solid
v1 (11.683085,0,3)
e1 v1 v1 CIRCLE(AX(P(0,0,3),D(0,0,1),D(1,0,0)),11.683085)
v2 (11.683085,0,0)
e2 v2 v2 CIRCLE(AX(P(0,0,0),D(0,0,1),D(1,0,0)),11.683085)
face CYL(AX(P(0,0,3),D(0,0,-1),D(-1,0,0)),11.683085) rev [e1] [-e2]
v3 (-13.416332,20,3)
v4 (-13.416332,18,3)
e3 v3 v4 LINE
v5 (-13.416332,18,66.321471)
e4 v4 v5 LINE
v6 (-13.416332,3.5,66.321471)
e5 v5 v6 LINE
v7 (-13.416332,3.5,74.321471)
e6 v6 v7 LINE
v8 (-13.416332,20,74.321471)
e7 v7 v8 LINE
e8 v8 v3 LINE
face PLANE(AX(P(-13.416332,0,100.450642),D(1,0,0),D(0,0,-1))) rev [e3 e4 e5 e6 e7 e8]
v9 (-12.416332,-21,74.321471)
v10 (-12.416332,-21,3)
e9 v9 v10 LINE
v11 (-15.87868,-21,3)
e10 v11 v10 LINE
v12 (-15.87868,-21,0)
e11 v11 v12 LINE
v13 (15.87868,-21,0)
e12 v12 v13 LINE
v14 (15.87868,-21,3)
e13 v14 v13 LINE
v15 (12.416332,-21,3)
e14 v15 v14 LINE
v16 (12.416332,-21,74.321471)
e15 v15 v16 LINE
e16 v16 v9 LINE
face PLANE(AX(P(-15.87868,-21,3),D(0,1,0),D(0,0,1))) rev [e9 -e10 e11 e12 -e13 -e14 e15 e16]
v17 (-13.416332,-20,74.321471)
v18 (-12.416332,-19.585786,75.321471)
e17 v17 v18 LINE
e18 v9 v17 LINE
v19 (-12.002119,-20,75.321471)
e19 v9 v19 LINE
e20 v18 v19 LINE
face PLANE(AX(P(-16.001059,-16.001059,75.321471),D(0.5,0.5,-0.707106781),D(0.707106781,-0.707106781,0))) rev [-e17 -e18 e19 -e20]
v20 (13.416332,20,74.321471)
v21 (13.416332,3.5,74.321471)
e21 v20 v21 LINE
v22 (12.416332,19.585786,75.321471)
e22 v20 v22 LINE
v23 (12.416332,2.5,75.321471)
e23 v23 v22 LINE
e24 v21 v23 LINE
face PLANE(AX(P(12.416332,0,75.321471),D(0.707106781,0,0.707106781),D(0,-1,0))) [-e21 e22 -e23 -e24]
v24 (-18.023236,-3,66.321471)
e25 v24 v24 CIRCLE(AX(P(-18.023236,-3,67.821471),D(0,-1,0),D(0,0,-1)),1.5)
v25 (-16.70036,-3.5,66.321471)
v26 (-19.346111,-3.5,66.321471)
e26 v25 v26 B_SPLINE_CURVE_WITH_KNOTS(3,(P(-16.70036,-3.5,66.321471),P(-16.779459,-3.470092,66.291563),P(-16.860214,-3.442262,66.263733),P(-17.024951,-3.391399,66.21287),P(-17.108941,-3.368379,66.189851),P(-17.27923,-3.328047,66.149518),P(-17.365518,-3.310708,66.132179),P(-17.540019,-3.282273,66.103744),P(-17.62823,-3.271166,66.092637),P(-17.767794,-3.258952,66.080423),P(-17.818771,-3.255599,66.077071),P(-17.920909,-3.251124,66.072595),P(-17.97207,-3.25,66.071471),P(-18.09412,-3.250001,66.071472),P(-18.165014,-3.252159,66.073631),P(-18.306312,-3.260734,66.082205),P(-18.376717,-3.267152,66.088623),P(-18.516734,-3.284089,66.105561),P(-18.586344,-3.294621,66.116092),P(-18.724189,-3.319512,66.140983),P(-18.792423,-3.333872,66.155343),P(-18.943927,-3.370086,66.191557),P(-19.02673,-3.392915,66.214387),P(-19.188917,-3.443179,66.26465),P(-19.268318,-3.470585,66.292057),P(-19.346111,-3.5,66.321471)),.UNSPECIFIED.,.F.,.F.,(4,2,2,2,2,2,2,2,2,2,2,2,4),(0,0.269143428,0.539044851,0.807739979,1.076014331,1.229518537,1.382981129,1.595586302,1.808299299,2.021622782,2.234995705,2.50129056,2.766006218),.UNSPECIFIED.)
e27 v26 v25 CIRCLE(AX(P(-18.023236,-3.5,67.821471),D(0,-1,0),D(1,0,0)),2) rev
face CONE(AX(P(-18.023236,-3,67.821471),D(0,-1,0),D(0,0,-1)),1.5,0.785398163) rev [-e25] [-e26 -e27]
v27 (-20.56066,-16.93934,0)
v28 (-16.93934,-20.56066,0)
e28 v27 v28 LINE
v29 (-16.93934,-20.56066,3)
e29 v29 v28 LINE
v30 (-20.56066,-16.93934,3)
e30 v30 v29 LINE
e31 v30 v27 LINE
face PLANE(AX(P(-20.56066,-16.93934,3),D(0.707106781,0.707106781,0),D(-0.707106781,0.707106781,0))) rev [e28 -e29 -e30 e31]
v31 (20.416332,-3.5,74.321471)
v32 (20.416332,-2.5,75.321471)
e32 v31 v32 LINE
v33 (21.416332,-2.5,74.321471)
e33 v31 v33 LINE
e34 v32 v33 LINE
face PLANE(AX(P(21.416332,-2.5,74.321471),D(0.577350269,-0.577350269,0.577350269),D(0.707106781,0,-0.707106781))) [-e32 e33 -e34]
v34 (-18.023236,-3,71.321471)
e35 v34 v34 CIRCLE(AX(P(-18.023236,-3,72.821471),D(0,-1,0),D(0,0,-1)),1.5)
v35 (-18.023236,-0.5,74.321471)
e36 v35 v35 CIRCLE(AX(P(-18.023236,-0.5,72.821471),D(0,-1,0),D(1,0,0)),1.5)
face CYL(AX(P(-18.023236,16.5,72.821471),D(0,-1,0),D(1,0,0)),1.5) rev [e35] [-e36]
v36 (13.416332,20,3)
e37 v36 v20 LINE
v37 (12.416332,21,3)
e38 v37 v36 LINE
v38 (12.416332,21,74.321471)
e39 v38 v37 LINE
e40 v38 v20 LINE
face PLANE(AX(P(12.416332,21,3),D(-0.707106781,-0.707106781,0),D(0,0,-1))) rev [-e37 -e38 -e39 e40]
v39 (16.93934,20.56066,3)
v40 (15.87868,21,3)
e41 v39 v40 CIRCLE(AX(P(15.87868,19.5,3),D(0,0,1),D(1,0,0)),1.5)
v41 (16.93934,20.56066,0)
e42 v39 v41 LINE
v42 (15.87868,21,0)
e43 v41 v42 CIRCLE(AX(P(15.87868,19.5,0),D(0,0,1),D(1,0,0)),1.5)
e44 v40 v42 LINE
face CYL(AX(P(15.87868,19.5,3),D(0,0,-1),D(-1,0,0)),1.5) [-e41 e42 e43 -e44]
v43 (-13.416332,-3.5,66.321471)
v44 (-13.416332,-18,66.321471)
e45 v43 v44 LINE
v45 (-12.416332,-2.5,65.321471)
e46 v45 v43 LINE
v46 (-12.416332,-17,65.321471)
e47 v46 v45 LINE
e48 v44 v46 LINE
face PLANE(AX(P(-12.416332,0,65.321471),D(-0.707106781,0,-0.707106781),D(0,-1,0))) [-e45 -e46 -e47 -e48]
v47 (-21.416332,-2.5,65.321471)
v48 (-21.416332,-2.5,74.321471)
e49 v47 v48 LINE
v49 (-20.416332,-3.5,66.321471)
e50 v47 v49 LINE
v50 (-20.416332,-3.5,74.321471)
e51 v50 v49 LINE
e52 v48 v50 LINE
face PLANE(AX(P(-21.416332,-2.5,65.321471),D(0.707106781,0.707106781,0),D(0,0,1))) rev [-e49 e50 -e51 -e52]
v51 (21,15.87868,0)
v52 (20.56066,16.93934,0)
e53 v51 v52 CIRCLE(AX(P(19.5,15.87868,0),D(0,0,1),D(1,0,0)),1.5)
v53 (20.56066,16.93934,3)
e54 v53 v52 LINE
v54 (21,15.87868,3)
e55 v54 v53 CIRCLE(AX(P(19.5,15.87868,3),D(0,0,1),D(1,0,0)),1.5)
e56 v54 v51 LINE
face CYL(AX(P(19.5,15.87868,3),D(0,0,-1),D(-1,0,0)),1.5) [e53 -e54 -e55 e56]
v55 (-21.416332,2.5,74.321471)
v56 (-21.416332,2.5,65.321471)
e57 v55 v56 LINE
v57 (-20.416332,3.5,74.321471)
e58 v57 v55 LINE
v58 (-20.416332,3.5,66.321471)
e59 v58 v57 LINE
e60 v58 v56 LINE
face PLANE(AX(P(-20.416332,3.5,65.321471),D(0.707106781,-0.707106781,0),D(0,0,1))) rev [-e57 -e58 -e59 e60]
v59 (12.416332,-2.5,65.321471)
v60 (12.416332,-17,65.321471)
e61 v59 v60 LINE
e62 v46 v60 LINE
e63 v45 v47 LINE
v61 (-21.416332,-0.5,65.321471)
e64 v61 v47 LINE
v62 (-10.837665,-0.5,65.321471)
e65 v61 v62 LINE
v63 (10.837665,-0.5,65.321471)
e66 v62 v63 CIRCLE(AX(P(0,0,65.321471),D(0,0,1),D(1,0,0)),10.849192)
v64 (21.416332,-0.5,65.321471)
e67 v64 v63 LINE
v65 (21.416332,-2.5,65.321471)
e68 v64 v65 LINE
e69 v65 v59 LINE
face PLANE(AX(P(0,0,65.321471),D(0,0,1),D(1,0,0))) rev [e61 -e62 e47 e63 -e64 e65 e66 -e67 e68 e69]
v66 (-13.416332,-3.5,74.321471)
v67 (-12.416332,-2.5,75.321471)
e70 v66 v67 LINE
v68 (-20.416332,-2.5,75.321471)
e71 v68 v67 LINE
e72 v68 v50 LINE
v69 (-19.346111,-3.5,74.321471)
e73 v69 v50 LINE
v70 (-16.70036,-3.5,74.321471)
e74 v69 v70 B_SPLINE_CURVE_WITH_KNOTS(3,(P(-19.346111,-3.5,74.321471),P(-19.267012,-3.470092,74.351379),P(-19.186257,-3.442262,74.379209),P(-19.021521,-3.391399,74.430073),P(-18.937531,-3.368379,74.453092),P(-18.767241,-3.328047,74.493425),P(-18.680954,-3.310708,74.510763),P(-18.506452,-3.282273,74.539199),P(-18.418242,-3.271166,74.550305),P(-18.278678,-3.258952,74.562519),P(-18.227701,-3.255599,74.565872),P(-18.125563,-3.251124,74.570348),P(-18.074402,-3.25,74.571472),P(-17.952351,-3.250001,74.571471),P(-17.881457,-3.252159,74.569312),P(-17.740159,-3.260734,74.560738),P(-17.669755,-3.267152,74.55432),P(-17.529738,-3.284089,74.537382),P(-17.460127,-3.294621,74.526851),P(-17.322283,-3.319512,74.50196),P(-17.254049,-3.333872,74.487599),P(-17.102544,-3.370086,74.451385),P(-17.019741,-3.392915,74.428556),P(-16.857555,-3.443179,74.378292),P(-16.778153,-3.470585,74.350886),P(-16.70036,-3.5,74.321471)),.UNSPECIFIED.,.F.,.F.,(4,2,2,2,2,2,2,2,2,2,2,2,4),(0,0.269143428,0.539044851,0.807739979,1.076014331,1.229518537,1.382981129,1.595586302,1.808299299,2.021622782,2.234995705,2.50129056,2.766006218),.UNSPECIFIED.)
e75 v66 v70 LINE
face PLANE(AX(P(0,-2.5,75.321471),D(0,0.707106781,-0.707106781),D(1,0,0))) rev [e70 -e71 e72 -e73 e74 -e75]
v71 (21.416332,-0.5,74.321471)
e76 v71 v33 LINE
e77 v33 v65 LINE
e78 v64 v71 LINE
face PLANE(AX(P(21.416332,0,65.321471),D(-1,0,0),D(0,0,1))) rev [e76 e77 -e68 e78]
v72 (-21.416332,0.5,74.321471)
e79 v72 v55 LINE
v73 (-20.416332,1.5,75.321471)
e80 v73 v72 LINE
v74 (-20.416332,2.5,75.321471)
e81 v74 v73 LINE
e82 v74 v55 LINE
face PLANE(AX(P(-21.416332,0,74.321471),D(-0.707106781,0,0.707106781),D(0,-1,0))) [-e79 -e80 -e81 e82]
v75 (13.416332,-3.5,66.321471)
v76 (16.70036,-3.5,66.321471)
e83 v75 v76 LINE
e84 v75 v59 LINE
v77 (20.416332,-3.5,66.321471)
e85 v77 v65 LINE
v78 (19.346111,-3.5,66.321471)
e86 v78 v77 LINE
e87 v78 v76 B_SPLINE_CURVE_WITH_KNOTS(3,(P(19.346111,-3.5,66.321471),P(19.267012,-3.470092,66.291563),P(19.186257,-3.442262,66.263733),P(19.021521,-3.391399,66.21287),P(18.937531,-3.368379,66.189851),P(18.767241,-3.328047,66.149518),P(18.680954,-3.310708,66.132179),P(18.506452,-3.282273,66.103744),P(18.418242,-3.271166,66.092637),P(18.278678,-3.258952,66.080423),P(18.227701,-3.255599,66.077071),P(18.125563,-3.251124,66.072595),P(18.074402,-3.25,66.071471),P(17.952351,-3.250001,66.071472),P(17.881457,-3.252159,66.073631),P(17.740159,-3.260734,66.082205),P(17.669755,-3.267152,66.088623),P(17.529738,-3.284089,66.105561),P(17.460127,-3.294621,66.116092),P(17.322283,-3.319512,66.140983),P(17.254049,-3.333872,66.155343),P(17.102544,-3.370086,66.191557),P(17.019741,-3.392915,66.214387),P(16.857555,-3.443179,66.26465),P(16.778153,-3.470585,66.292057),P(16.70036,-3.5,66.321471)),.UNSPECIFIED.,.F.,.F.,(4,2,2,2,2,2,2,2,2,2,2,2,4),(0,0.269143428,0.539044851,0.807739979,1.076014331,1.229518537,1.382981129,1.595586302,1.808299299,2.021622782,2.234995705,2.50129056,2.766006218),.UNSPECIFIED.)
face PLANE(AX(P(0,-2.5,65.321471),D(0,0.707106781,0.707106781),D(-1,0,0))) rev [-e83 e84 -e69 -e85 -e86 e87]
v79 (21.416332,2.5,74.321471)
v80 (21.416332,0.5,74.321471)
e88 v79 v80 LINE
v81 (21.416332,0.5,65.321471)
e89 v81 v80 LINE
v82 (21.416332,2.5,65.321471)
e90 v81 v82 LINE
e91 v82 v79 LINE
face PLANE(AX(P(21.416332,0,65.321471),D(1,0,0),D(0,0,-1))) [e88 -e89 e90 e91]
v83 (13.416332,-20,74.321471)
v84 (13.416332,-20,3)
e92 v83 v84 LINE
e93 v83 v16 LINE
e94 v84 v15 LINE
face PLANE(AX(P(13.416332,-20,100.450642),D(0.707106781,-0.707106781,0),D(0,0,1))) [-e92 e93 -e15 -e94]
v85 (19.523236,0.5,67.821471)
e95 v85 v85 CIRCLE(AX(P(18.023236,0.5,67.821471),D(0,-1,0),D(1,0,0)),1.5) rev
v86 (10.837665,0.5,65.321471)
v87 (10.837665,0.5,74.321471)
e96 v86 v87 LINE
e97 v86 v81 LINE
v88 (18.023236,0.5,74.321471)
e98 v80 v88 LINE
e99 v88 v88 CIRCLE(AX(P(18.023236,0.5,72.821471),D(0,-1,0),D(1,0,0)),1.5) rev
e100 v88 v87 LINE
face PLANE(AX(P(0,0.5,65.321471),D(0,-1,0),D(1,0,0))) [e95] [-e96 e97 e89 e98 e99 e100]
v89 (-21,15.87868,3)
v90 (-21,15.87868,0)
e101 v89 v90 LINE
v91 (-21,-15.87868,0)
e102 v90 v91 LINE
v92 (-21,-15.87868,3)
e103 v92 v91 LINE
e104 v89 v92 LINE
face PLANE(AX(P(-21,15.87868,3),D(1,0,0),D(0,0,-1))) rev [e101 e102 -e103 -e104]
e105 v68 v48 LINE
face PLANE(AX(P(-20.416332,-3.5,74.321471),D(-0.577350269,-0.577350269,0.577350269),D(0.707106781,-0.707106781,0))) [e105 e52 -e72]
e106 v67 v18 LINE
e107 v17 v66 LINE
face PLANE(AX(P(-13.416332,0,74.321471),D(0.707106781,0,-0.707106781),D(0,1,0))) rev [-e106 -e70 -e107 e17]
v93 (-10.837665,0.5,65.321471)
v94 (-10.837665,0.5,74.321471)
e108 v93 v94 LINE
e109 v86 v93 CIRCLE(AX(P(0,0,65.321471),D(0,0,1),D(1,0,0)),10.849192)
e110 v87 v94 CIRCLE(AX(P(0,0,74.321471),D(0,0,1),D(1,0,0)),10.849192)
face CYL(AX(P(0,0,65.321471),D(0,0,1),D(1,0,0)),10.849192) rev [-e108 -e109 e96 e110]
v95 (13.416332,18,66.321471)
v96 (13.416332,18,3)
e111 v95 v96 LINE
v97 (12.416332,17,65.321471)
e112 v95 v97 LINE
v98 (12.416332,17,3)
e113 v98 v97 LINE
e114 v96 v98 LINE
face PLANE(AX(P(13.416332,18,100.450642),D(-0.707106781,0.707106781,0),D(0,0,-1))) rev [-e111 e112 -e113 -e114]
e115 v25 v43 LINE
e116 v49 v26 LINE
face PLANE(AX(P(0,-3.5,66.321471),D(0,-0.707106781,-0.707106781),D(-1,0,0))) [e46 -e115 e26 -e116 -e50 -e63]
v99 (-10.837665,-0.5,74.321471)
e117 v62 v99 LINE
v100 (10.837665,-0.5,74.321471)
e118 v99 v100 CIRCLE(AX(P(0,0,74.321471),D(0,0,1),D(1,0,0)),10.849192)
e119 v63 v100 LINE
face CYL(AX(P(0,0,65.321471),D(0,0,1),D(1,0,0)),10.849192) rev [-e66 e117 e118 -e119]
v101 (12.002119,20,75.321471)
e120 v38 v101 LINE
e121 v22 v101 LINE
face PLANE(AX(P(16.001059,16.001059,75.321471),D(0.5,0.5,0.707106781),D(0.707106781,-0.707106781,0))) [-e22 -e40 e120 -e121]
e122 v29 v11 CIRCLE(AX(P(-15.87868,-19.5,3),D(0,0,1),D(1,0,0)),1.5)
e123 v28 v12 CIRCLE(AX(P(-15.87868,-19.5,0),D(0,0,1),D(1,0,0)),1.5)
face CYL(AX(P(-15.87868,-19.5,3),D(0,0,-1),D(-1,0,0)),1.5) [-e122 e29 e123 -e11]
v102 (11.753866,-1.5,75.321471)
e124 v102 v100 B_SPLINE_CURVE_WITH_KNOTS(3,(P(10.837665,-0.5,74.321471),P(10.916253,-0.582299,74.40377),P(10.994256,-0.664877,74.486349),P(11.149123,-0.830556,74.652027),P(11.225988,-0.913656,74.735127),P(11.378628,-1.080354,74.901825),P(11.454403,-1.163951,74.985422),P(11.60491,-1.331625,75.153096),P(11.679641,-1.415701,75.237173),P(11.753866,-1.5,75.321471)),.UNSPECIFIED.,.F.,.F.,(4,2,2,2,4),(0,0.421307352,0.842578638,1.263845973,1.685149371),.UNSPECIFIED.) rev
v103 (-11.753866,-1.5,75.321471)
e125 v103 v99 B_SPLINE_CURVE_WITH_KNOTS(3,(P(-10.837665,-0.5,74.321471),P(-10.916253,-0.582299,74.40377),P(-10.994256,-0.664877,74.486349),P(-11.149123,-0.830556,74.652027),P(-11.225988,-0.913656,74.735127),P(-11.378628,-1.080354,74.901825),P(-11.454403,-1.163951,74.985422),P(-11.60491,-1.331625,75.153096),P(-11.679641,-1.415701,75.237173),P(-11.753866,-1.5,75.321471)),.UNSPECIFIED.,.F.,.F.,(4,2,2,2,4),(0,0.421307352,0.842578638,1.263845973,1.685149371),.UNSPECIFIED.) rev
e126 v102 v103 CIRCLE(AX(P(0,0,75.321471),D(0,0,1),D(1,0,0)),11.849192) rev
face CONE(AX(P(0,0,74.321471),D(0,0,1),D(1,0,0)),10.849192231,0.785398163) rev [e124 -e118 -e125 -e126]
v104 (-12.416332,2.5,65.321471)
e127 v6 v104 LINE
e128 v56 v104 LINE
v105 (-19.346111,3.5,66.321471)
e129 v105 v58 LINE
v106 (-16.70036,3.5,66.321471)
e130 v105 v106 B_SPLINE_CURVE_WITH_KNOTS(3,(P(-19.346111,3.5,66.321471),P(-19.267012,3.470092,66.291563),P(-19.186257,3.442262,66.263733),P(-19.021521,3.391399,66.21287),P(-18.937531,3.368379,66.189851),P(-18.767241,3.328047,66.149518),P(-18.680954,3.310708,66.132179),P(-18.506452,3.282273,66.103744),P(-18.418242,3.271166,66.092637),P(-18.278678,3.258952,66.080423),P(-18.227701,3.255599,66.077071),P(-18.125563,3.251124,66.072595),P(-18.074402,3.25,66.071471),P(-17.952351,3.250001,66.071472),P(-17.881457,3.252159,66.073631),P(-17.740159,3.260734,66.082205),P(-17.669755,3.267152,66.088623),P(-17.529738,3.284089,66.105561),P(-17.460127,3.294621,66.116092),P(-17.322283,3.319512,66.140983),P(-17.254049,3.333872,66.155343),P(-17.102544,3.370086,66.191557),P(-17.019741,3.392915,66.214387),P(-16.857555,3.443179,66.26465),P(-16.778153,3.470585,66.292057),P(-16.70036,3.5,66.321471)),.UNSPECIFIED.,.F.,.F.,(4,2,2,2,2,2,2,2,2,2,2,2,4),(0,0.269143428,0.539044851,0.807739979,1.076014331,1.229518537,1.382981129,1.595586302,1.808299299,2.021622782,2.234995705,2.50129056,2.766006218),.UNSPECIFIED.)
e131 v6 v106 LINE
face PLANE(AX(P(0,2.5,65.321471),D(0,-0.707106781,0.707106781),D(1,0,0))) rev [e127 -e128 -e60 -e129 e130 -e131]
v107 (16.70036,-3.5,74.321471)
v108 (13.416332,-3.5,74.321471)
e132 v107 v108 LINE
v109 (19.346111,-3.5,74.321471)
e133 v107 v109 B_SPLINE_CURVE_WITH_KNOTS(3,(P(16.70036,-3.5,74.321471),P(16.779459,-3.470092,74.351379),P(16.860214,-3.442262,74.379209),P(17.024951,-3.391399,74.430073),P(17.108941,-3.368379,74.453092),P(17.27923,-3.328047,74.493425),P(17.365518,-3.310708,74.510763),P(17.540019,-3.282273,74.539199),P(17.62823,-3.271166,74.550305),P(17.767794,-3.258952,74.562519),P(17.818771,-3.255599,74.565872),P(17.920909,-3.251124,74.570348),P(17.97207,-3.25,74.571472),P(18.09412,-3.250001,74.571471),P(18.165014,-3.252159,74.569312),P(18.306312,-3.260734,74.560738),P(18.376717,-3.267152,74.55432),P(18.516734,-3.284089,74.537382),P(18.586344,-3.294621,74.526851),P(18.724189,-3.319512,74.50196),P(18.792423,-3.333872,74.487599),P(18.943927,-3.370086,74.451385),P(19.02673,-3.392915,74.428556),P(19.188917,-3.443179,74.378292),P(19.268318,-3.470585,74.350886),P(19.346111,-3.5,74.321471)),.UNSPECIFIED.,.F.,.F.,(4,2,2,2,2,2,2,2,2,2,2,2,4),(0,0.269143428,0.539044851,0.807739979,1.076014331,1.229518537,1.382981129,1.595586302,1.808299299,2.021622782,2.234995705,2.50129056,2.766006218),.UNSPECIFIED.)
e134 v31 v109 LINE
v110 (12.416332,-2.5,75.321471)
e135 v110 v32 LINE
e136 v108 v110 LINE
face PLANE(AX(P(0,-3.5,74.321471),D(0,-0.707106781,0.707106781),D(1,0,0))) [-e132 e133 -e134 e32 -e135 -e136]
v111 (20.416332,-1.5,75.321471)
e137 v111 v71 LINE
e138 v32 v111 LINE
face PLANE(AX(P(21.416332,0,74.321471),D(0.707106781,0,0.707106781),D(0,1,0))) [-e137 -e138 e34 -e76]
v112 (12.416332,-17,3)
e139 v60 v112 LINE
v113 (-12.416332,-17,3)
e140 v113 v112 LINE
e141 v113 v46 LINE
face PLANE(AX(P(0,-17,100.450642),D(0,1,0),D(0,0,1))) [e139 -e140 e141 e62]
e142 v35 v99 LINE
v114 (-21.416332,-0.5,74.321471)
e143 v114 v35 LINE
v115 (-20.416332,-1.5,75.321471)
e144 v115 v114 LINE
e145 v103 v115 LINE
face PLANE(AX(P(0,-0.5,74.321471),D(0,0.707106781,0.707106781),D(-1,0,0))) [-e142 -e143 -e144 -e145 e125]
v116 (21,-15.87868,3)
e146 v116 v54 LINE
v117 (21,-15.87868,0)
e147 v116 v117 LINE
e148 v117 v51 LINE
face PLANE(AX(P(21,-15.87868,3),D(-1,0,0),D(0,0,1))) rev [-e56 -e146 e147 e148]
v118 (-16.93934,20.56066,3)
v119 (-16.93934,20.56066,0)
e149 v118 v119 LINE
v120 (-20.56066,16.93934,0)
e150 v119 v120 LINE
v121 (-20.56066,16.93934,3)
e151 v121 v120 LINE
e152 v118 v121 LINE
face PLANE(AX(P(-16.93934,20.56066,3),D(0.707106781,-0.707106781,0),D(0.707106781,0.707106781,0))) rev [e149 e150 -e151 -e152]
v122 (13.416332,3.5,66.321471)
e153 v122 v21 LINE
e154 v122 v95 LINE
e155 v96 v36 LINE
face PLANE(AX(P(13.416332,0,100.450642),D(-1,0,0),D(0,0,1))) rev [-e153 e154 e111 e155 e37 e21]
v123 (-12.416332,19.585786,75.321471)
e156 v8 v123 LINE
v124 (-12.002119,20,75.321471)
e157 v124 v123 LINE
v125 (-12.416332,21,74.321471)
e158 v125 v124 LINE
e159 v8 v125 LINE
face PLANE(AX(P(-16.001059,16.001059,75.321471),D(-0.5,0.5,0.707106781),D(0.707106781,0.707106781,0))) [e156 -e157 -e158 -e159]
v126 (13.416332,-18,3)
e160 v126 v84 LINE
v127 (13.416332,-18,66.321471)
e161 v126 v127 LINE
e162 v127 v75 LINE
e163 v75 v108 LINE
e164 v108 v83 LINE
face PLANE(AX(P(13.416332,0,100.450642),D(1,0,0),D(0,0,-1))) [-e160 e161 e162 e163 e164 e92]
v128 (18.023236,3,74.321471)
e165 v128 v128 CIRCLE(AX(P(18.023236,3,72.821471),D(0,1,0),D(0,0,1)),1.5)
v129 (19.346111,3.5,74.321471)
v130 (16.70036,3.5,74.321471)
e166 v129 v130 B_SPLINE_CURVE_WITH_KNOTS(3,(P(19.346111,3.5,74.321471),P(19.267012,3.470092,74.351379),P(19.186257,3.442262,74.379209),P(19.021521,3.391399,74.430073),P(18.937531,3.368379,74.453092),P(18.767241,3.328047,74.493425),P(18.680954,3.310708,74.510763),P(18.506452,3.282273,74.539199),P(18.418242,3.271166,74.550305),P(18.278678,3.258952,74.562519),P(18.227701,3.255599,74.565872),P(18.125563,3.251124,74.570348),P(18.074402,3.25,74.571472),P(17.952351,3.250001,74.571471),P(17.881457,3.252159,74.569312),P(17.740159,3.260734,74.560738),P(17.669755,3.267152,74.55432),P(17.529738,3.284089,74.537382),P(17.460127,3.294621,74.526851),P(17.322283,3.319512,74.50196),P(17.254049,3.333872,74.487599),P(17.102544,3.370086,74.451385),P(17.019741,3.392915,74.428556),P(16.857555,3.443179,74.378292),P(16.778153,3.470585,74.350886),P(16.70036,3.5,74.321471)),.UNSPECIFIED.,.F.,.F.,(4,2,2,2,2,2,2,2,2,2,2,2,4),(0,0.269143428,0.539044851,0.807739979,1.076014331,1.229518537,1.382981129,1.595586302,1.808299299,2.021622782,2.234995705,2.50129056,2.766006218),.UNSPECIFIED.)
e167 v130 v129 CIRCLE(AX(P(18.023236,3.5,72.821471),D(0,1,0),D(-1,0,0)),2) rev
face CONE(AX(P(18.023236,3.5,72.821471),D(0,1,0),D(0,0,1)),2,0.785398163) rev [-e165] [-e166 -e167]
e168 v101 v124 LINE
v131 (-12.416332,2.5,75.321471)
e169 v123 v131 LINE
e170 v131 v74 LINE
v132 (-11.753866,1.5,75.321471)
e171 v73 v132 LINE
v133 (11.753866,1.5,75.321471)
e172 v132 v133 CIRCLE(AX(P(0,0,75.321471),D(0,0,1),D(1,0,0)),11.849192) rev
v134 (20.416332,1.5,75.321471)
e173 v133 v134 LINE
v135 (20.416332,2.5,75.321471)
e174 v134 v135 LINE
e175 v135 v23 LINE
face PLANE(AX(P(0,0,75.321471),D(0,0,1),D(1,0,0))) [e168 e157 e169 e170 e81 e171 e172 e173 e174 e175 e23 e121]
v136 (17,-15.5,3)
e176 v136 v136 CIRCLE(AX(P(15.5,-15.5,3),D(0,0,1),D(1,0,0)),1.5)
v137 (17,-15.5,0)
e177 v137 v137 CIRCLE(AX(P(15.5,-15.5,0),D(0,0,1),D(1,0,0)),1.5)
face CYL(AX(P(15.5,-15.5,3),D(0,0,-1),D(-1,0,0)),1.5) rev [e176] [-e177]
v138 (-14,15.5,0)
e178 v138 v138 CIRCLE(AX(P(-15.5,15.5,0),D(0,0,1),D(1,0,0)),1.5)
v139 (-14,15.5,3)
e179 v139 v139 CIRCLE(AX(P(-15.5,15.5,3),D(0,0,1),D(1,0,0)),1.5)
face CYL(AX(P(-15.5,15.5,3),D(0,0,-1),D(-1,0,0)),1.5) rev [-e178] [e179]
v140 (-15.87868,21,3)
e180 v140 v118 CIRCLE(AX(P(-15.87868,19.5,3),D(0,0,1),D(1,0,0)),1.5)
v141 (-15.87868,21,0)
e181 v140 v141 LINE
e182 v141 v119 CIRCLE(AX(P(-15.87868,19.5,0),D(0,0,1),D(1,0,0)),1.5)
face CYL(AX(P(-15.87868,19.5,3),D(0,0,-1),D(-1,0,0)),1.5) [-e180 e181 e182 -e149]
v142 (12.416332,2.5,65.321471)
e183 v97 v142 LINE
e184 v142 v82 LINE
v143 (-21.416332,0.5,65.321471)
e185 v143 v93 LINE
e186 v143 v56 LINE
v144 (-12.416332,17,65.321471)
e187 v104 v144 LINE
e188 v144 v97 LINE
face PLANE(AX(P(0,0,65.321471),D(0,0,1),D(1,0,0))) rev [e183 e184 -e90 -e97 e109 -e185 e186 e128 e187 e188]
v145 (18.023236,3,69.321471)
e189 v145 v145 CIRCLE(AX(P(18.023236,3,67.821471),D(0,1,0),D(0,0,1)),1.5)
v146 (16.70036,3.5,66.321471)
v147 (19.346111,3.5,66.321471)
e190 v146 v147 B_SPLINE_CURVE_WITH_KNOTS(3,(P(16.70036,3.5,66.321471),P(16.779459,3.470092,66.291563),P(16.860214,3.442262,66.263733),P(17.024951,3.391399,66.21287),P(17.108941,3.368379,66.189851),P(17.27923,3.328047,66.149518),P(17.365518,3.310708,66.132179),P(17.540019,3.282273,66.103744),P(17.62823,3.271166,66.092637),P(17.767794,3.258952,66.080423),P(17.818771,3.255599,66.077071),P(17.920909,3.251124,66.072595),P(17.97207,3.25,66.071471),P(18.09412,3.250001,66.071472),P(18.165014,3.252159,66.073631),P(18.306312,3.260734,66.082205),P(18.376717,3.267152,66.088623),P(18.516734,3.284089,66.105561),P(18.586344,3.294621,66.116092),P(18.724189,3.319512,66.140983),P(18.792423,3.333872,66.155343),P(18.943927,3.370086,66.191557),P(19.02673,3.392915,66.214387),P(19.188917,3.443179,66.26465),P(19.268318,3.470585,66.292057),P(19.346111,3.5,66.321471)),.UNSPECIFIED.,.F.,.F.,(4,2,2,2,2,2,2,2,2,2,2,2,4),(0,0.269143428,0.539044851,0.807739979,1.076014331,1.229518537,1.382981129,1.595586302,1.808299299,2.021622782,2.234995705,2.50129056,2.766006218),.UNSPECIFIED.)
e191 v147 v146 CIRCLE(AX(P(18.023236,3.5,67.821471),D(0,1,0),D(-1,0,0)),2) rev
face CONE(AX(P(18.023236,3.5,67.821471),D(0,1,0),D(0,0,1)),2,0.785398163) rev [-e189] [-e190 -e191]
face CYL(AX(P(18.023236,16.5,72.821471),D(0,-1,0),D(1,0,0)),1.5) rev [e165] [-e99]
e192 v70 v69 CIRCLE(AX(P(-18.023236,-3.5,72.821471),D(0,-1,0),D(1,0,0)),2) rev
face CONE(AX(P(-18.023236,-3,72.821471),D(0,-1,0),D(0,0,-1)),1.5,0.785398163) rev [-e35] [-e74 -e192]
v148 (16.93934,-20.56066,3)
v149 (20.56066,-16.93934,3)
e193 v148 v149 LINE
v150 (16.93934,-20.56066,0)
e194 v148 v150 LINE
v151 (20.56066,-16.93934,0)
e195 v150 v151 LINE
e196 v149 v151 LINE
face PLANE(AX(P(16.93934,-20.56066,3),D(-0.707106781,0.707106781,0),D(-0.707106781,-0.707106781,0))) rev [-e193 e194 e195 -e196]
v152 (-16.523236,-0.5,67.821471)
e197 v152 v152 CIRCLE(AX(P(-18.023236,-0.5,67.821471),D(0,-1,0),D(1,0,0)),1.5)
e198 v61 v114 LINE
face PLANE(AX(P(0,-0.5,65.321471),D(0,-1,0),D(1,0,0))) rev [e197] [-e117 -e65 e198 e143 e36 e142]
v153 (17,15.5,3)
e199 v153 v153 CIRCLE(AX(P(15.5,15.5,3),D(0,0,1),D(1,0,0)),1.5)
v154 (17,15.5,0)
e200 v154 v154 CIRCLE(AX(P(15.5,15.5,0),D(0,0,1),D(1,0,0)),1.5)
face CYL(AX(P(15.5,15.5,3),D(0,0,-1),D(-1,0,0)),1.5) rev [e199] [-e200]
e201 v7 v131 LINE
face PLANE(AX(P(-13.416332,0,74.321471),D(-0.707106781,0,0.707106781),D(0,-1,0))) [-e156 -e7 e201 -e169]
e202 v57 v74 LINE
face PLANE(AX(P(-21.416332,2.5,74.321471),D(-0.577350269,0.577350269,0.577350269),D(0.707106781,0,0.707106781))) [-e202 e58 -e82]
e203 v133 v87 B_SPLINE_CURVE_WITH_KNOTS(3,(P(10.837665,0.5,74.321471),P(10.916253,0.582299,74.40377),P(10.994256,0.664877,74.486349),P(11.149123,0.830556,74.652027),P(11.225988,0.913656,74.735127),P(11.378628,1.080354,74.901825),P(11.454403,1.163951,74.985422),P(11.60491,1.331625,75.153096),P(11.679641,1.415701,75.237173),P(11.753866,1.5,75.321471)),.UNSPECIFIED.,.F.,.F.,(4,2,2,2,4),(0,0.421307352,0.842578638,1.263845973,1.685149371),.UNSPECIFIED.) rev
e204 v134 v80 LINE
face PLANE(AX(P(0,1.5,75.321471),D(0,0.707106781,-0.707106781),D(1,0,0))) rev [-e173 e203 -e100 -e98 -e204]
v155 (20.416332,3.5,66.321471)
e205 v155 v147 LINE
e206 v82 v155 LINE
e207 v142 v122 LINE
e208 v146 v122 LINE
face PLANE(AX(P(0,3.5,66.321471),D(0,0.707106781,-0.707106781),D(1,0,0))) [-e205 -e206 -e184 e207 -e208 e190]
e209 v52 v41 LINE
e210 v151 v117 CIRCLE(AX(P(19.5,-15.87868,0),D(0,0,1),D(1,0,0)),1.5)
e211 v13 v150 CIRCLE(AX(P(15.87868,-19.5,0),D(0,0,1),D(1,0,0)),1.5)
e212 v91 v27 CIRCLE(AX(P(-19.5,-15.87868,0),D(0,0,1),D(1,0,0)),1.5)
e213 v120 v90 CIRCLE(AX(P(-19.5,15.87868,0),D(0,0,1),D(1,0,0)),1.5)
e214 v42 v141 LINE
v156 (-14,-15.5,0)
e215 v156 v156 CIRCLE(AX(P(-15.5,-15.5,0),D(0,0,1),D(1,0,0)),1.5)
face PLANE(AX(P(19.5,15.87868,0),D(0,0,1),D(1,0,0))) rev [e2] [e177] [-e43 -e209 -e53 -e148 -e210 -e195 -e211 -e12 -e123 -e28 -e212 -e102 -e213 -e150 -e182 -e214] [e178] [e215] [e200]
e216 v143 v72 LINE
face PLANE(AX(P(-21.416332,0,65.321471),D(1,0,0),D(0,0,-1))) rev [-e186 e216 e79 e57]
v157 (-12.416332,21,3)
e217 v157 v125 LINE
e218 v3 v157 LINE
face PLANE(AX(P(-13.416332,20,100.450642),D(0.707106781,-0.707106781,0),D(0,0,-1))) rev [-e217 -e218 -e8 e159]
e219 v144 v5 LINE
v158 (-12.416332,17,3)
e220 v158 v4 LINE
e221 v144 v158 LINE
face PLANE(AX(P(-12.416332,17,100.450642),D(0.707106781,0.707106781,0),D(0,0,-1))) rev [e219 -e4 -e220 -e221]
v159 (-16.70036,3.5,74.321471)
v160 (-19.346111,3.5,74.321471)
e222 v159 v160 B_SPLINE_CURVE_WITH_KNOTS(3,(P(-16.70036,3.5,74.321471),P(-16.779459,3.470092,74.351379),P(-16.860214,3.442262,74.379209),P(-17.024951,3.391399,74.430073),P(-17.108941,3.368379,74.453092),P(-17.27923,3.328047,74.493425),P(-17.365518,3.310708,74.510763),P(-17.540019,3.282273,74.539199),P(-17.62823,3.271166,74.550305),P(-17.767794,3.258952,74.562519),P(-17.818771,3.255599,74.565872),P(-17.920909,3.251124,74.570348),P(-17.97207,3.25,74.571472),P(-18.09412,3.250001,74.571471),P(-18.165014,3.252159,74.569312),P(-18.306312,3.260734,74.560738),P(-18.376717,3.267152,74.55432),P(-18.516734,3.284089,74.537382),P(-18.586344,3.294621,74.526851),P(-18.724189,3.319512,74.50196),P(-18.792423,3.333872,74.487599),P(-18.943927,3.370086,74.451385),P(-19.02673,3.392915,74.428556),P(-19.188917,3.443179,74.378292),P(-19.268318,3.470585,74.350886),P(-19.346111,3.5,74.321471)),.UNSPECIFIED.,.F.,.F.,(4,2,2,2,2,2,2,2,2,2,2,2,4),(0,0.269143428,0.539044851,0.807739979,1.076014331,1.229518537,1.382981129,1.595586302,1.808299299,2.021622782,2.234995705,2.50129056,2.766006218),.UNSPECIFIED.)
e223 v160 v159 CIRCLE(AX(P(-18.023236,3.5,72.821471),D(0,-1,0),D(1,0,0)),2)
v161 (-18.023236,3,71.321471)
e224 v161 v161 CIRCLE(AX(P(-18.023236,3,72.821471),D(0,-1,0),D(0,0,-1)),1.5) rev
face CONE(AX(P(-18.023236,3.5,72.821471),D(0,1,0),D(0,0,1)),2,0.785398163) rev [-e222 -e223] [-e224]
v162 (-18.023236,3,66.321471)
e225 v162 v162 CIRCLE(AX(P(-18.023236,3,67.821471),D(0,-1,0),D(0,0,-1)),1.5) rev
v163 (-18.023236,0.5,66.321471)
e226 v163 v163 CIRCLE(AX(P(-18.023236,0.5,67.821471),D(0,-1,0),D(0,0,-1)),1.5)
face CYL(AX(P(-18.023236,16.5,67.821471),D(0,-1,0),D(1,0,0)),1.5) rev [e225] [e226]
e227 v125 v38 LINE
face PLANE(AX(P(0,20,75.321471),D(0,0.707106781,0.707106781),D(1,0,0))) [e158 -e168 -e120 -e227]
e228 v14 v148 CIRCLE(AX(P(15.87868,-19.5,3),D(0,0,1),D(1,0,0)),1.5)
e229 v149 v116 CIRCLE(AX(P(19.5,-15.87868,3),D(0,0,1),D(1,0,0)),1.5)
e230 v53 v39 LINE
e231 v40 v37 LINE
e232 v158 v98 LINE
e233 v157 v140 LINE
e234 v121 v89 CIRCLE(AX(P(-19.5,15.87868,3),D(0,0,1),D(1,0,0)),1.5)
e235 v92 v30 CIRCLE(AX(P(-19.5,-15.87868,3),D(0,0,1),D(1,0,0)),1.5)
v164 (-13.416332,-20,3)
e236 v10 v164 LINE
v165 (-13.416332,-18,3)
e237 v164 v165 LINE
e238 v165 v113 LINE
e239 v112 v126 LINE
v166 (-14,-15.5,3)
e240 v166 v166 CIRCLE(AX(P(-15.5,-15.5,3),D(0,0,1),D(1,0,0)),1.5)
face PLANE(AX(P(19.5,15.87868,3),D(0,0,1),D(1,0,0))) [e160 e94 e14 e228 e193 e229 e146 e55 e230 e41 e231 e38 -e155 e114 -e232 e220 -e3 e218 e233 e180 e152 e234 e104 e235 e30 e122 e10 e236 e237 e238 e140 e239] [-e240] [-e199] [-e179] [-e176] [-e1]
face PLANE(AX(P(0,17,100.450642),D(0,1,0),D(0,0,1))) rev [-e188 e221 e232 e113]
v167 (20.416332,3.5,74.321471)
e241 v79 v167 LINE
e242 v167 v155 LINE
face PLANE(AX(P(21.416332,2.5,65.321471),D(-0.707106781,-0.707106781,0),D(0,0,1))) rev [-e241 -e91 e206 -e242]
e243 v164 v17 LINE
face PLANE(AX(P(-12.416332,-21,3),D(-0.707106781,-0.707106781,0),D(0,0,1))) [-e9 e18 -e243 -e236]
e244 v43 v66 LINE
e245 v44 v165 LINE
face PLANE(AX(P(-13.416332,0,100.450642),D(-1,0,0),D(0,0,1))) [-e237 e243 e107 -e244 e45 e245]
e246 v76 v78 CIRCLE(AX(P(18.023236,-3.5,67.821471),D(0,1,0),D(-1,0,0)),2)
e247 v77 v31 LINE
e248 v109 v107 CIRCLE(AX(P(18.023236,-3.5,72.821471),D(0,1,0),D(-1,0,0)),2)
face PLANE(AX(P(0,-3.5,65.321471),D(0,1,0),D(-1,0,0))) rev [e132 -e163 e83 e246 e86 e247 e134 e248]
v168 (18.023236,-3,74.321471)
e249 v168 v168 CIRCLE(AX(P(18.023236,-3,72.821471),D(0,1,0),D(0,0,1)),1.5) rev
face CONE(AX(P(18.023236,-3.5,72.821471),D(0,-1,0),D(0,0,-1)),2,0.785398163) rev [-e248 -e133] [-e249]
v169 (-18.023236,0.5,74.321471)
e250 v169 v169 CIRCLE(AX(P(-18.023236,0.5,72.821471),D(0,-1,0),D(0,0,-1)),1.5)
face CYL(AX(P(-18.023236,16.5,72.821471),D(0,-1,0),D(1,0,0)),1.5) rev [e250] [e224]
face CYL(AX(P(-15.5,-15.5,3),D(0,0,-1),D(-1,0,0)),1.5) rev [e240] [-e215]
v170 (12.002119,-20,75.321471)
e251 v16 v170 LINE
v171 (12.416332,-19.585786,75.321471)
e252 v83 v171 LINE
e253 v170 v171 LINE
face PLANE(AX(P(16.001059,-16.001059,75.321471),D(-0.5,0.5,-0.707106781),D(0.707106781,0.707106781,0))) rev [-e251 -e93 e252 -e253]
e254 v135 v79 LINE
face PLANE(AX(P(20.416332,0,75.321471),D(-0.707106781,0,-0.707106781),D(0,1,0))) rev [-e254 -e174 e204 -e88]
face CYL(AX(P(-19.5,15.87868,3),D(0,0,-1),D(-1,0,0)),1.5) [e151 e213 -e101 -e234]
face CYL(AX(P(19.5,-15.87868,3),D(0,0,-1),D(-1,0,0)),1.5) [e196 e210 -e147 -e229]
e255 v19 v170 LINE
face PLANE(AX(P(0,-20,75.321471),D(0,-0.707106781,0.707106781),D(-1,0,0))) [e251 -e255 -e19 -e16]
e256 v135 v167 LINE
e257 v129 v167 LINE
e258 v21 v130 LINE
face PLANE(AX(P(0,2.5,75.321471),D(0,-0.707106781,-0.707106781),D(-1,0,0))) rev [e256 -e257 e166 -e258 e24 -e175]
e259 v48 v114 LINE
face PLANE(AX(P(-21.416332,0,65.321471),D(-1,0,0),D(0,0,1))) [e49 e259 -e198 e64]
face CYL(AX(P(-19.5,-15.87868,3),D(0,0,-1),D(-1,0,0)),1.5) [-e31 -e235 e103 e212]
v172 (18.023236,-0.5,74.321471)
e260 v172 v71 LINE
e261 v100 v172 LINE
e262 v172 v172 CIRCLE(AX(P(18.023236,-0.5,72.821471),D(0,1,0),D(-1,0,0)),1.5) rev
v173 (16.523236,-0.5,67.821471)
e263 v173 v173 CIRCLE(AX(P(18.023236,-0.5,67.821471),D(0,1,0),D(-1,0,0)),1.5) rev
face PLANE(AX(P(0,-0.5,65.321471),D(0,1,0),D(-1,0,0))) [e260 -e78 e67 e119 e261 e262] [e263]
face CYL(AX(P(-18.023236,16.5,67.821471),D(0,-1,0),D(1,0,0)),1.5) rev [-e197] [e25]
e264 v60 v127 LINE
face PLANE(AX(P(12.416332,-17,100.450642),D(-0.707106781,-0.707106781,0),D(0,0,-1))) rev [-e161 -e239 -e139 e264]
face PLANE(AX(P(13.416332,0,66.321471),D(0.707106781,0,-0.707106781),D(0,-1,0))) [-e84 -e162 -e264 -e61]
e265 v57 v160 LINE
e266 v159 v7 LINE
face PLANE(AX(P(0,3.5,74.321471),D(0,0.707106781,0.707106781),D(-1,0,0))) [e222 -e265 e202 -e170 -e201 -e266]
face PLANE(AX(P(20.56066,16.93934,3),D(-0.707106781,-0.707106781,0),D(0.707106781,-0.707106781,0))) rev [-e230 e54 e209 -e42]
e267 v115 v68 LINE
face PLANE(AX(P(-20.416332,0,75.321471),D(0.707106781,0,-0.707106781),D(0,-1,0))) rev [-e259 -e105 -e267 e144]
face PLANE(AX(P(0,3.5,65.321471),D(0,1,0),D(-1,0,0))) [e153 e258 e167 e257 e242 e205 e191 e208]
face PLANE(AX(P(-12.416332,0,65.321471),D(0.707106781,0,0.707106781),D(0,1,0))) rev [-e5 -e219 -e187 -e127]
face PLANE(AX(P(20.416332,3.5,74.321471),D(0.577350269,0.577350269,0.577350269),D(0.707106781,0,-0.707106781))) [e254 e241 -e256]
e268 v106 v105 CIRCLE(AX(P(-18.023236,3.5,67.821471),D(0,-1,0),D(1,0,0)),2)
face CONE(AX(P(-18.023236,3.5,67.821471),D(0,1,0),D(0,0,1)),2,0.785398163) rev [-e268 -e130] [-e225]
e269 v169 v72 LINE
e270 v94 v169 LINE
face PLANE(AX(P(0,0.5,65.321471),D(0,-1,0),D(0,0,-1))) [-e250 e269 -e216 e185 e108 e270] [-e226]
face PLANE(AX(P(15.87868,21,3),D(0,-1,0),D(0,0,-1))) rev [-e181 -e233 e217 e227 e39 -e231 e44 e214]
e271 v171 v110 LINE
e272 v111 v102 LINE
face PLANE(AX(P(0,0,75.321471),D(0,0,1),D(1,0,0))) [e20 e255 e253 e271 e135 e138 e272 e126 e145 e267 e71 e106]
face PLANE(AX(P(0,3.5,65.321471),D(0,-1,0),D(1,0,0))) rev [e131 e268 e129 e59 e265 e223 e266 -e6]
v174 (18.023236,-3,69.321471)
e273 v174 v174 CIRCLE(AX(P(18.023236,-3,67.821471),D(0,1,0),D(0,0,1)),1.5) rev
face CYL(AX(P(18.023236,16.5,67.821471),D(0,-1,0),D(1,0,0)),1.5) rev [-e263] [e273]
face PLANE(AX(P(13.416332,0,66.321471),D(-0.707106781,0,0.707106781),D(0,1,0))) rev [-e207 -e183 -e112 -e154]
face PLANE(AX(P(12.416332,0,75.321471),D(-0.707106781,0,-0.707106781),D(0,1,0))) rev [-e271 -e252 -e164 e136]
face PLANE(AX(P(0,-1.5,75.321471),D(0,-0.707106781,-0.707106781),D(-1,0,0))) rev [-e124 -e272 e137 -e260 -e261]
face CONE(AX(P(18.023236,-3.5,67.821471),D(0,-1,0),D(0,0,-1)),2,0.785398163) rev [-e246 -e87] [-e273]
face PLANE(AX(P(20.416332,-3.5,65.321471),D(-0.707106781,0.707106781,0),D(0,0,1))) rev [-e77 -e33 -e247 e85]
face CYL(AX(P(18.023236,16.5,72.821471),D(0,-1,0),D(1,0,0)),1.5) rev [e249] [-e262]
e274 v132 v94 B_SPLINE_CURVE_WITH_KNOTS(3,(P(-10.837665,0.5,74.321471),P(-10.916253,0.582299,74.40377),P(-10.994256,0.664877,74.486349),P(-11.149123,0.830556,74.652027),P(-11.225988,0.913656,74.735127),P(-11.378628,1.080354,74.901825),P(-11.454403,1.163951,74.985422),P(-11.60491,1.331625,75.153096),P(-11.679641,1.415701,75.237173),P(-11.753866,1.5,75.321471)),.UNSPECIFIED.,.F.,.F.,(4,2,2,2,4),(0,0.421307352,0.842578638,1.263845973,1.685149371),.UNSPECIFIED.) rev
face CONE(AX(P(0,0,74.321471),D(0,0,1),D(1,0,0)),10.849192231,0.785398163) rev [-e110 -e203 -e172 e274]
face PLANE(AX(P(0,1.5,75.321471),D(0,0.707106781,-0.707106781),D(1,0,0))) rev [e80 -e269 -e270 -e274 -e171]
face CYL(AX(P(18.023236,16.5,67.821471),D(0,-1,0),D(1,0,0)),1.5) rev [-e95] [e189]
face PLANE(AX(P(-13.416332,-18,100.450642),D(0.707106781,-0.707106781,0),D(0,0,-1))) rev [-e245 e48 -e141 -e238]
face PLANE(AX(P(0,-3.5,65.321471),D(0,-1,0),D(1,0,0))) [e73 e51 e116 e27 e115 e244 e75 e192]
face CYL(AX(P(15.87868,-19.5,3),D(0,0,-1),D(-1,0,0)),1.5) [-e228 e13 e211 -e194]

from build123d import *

# Parameters (mm, degrees)
SKETCH1_R                = 1.5
SKETCH1_R_2              = 11.683085131
BOSS_EXTRUDE1_DEPTH      = 3
SKETCH2_W                = 26.83266495
SKETCH2_H                = 4
BOSS_EXTRUDE2_DEPTH      = 70.321471268
BOSS_EXTRUDE3_DEPTH      = 2
BOSS_EXTRUDE3_DEPTH_BACK = 8
SKETCH4_R                = 1.5
CUT_EXTRUDE1_DEPTH       = 20
CHAMFER1_SIZE            = 1
CHAMFER2_SIZE            = 1
CHAMFER3_SIZE            = 1
CHAMFER4_SIZE            = 0.5


# Some blends are built 0.0001 mm under size
with BuildPart() as part:
    # Sketch1 → Boss-Extrude1 (new body)
    with BuildSketch(Plane.XY):
        with BuildLine():
            Line((20.560660172, 16.939339828), (16.939339828, 20.560660172))
            ThreePointArc((16.939339828, 20.560660172), (16.452704805, 20.885819299), (15.878679656, 21))
            Line((15.878679656, 21), (-15.878679656, 21))
            ThreePointArc((-15.878679656, 21), (-16.452704805, 20.885819299), (-16.939339828, 20.560660172))
            Line((-16.939339828, 20.560660172), (-20.560660172, 16.939339828))
            ThreePointArc((-20.560660172, 16.939339828), (-20.885819299, 16.452704805), (-21, 15.878679656))
            Line((-21, 15.878679656), (-21, -15.878679656))
            ThreePointArc((-21, -15.878679656), (-20.885819299, -16.452704805), (-20.560660172, -16.939339828))
            Line((-20.560660172, -16.939339828), (-16.939339828, -20.560660172))
            ThreePointArc((-16.939339828, -20.560660172), (-16.452704805, -20.885819299), (-15.878679656, -21))
            Line((-15.878679656, -21), (15.878679656, -21))
            ThreePointArc((15.878679656, -21), (16.452704805, -20.885819299), (16.939339828, -20.560660172))
            Line((16.939339828, -20.560660172), (20.560660172, -16.939339828))
            ThreePointArc((20.560660172, -16.939339828), (20.885819299, -16.452704805), (21, -15.878679656))
            Line((21, -15.878679656), (21, 15.878679656))
            ThreePointArc((21, 15.878679656), (20.885819299, 16.452704805), (20.560660172, 16.939339828))
        make_face()
        with Locations((-15.5, 15.5)):
            Circle(SKETCH1_R, mode=Mode.SUBTRACT)
        with Locations((15.5, 15.5)):
            Circle(SKETCH1_R, mode=Mode.SUBTRACT)
        with Locations((15.5, -15.5)):
            Circle(SKETCH1_R, mode=Mode.SUBTRACT)
        with Locations((-15.5, -15.5)):
            Circle(SKETCH1_R, mode=Mode.SUBTRACT)
        Circle(SKETCH1_R_2, mode=Mode.SUBTRACT)
    extrude(amount=BOSS_EXTRUDE1_DEPTH)

    # Sketch2 → Boss-Extrude2 (add)
    with BuildSketch(Plane.XY.offset(3)):
        with Locations((0, -19)):
            Rectangle(SKETCH2_W, SKETCH2_H)
        with Locations((0, 19)):
            Rectangle(SKETCH2_W, SKETCH2_H)
    extrude(amount=BOSS_EXTRUDE2_DEPTH)

    # Sketch3 → Boss-Extrude3 (add, two sides: drawn at the far end of the back side and taken through both)
    with BuildSketch(Plane.XY.offset(73.321471268).offset(-BOSS_EXTRUDE3_DEPTH_BACK)):
        with BuildLine():
            Line((21.416332475, 3.5), (13.416332475, 3.5))
            Line((13.416332475, 3.5), (13.416332475, 21))
            Line((13.416332475, 21), (-13.416332475, 21))
            Line((-13.416332475, 21), (-13.416332475, 3.5))
            Line((-13.416332475, 3.5), (-21.416332475, 3.5))
            Line((-21.416332475, 3.5), (-21.416332475, 0.5))
            Line((-21.416332475, 0.5), (-10.837664512, 0.5))
            ThreePointArc((-10.837664512, 0.5), (-7.492675622, 7.846322966), (0, 10.849192231))
            ThreePointArc((0, 10.849192231), (7.492675622, 7.846322966), (10.837664512, 0.5))
            Line((10.837664512, 0.5), (21.416332475, 0.5))
            Line((21.416332475, 0.5), (21.416332475, 3.5))
        make_face()
        with BuildLine():
            Line((-13.416332475, -21), (13.416332475, -21))
            Line((13.416332475, -21), (13.416332475, -3.5))
            Line((13.416332475, -3.5), (21.416332475, -3.5))
            Line((21.416332475, -3.5), (21.416332475, -0.5))
            Line((21.416332475, -0.5), (10.837664512, -0.5))
            ThreePointArc((10.837664512, -0.5), (0, -10.849192231), (-10.837664512, -0.5))
            Line((-10.837664512, -0.5), (-21.416332475, -0.5))
            Line((-21.416332475, -0.5), (-21.416332475, -3.5))
            Line((-21.416332475, -3.5), (-13.416332475, -3.5))
            Line((-13.416332475, -3.5), (-13.416332475, -21))
        make_face()
    extrude(amount=BOSS_EXTRUDE3_DEPTH + BOSS_EXTRUDE3_DEPTH_BACK)

    # Sketch4 → Cut-Extrude1 (cut)
    with BuildSketch(Plane.XZ.offset(3.5)):
        with Locations((-18.023235698, 72.821471268)):
            Circle(SKETCH4_R)
        with Locations((-18.023235698, 67.821471268)):
            Circle(SKETCH4_R)
        with Locations((18.023235698, 72.821471268)):
            Circle(SKETCH4_R)
        with Locations((18.023235698, 67.821471268)):
            Circle(SKETCH4_R)
    extrude(amount=-CUT_EXTRUDE1_DEPTH, mode=Mode.SUBTRACT)

    # Chamfer1
    chamfer1_edges = [part.edges().sort_by_distance(p)[0] for p in [
        (-13.416332475, 17, 34.160735634),
        (13.416332475, 17, 34.160735634),
        (-13.416332475, -21, 39.160735634),
        (13.416332475, -21, 39.160735634),
        (-13.416332475, 21, 39.160735634),
        (13.416332475, 21, 39.160735634),
        (13.416332475, -17, 34.160735634),
        (-13.416332475, -17, 34.160735634),
    ]]
    chamfer(chamfer1_edges, length=CHAMFER1_SIZE)

    # Chamfer2
    chamfer2_edges = [part.edges().sort_by_distance(p)[0] for p in [
        (-17.416332475, -3.5, 75.321471268),
        (-13.416332475, -10.75, 65.321471268),
        (-17.416332475, -3.5, 65.321471268),
        (-21.416332475, -3.5, 70.321471268),
        (-21.416332475, -2, 75.321471268),
        (-16.126998493, -0.5, 75.321471268),
        (0, -10.849192231, 75.321471268),
        (16.126998493, -0.5, 75.321471268),
        (21.416332475, -2, 75.321471268),
        (-13.416332475, -11.75, 75.321471268),
        (-12.916332475, -20.5, 75.321471268),
        (0, -21, 75.321471268),
        (12.916332475, -20.5, 75.321471268),
        (13.416332475, -11.75, 75.321471268),
        (17.416332475, -3.5, 75.321471268),
        (17.416332475, -3.5, 65.321471268),
        (21.416332475, -3.5, 70.321471268),
        (17.416332475, 3.5, 75.321471268),
        (17.416332475, 3.5, 65.321471268),
        (21.416332475, 3.5, 70.321471268),
        (21.416332475, 2, 75.321471268),
        (16.126998493, 0.5, 75.321471268),
        (0, 10.849192231, 75.321471268),
        (-16.126998493, 0.5, 75.321471268),
        (-21.416332475, 2, 75.321471268),
        (-13.416332475, 10.75, 65.321471268),
        (-17.416332475, 3.5, 65.321471268),
        (-21.416332475, 3.5, 70.321471268),
        (-17.416332475, 3.5, 75.321471268),
        (-13.416332475, 11.75, 75.321471268),
        (-12.916332475, 20.5, 75.321471268),
        (13.416332475, 11.75, 75.321471268),
        (12.916332475, 20.5, 75.321471268),
        (0, 21, 75.321471268),
    ]]
    chamfer(chamfer2_edges, length=CHAMFER2_SIZE - 0.0001)  # a hair under: the kernel refuses the full size

    # Chamfer3
    chamfer3_edges = [part.edges().sort_by_distance(p)[0] for p in [
        (13.416332475, 10.25005, 65.321471268),
        (13.416332475, -10.25005, 65.321471268),
    ]]
    chamfer(chamfer3_edges, length=CHAMFER3_SIZE)

    # Chamfer4
    # the kernel refuses this chamfer: 0.5 mm, written as the material it takes off along each edge
    with BuildSketch(Plane(origin=(-18.023235698, 3.5, 67.821471268), x_dir=(1, 0, 0), z_dir=(0, 0, -1))) as chamfer4_piece_1:
        Polygon((1.5, CHAMFER4_SIZE), (1.5 + CHAMFER4_SIZE, 0), (1.5, 0), align=None)
    revolve(axis=Axis((-18.023235698, 3.5, 67.821471268), (0, -1, 0)), mode=Mode.SUBTRACT)
    with BuildSketch(Plane(origin=(-18.023235698, -3.5, 67.821471268), x_dir=(1, 0, 0), z_dir=(0, 0, -1))) as chamfer4_piece_2:
        Polygon((1.5 + CHAMFER4_SIZE, 0), (1.5, -CHAMFER4_SIZE), (1.5, 0), align=None)
    revolve(axis=Axis((-18.023235698, -3.5, 67.821471268), (0, -1, 0)), mode=Mode.SUBTRACT)
    with BuildSketch(Plane(origin=(18.023235698, -3.5, 72.821471268), x_dir=(1, 0, 0), z_dir=(0, 0, -1))) as chamfer4_piece_3:
        Polygon((1.5 + CHAMFER4_SIZE, 0), (1.5, -CHAMFER4_SIZE), (1.5, 0), align=None)
    revolve(axis=Axis((18.023235698, -3.5, 72.821471268), (0, -1, 0)), mode=Mode.SUBTRACT)
    with BuildSketch(Plane(origin=(18.023235698, 3.5, 72.821471268), x_dir=(1, 0, 0), z_dir=(0, 0, -1))) as chamfer4_piece_4:
        Polygon((1.5 + CHAMFER4_SIZE, 0), (1.5, CHAMFER4_SIZE), (1.5, 0), align=None)
    revolve(axis=Axis((18.023235698, 3.5, 72.821471268), (0, -1, 0)), mode=Mode.SUBTRACT)
    with BuildSketch(Plane(origin=(18.023235698, -3.5, 67.821471268), x_dir=(1, 0, 0), z_dir=(0, 0, -1))) as chamfer4_piece_5:
        Polygon((1.5 + CHAMFER4_SIZE, 0), (1.5, -CHAMFER4_SIZE), (1.5, 0), align=None)
    revolve(axis=Axis((18.023235698, -3.5, 67.821471268), (0, -1, 0)), mode=Mode.SUBTRACT)
    with BuildSketch(Plane(origin=(18.023235698, 3.5, 67.821471268), x_dir=(1, 0, 0), z_dir=(0, 0, -1))) as chamfer4_piece_6:
        Polygon((1.5 + CHAMFER4_SIZE, 0), (1.5, CHAMFER4_SIZE), (1.5, 0), align=None)
    revolve(axis=Axis((18.023235698, 3.5, 67.821471268), (0, -1, 0)), mode=Mode.SUBTRACT)
    with BuildSketch(Plane(origin=(-18.023235698, 3.5, 72.821471268), x_dir=(1, 0, 0), z_dir=(0, 0, -1))) as chamfer4_piece_7:
        Polygon((1.5, CHAMFER4_SIZE), (1.5 + CHAMFER4_SIZE, 0), (1.5, 0), align=None)
    revolve(axis=Axis((-18.023235698, 3.5, 72.821471268), (0, -1, 0)), mode=Mode.SUBTRACT)
    with BuildSketch(Plane(origin=(-18.023235698, -3.5, 72.821471268), x_dir=(1, 0, 0), z_dir=(0, 0, -1))) as chamfer4_piece_8:
        Polygon((1.5 + CHAMFER4_SIZE, 0), (1.5, -CHAMFER4_SIZE), (1.5, 0), align=None)
    revolve(axis=Axis((-18.023235698, -3.5, 72.821471268), (0, -1, 0)), mode=Mode.SUBTRACT)


solid = part.part
